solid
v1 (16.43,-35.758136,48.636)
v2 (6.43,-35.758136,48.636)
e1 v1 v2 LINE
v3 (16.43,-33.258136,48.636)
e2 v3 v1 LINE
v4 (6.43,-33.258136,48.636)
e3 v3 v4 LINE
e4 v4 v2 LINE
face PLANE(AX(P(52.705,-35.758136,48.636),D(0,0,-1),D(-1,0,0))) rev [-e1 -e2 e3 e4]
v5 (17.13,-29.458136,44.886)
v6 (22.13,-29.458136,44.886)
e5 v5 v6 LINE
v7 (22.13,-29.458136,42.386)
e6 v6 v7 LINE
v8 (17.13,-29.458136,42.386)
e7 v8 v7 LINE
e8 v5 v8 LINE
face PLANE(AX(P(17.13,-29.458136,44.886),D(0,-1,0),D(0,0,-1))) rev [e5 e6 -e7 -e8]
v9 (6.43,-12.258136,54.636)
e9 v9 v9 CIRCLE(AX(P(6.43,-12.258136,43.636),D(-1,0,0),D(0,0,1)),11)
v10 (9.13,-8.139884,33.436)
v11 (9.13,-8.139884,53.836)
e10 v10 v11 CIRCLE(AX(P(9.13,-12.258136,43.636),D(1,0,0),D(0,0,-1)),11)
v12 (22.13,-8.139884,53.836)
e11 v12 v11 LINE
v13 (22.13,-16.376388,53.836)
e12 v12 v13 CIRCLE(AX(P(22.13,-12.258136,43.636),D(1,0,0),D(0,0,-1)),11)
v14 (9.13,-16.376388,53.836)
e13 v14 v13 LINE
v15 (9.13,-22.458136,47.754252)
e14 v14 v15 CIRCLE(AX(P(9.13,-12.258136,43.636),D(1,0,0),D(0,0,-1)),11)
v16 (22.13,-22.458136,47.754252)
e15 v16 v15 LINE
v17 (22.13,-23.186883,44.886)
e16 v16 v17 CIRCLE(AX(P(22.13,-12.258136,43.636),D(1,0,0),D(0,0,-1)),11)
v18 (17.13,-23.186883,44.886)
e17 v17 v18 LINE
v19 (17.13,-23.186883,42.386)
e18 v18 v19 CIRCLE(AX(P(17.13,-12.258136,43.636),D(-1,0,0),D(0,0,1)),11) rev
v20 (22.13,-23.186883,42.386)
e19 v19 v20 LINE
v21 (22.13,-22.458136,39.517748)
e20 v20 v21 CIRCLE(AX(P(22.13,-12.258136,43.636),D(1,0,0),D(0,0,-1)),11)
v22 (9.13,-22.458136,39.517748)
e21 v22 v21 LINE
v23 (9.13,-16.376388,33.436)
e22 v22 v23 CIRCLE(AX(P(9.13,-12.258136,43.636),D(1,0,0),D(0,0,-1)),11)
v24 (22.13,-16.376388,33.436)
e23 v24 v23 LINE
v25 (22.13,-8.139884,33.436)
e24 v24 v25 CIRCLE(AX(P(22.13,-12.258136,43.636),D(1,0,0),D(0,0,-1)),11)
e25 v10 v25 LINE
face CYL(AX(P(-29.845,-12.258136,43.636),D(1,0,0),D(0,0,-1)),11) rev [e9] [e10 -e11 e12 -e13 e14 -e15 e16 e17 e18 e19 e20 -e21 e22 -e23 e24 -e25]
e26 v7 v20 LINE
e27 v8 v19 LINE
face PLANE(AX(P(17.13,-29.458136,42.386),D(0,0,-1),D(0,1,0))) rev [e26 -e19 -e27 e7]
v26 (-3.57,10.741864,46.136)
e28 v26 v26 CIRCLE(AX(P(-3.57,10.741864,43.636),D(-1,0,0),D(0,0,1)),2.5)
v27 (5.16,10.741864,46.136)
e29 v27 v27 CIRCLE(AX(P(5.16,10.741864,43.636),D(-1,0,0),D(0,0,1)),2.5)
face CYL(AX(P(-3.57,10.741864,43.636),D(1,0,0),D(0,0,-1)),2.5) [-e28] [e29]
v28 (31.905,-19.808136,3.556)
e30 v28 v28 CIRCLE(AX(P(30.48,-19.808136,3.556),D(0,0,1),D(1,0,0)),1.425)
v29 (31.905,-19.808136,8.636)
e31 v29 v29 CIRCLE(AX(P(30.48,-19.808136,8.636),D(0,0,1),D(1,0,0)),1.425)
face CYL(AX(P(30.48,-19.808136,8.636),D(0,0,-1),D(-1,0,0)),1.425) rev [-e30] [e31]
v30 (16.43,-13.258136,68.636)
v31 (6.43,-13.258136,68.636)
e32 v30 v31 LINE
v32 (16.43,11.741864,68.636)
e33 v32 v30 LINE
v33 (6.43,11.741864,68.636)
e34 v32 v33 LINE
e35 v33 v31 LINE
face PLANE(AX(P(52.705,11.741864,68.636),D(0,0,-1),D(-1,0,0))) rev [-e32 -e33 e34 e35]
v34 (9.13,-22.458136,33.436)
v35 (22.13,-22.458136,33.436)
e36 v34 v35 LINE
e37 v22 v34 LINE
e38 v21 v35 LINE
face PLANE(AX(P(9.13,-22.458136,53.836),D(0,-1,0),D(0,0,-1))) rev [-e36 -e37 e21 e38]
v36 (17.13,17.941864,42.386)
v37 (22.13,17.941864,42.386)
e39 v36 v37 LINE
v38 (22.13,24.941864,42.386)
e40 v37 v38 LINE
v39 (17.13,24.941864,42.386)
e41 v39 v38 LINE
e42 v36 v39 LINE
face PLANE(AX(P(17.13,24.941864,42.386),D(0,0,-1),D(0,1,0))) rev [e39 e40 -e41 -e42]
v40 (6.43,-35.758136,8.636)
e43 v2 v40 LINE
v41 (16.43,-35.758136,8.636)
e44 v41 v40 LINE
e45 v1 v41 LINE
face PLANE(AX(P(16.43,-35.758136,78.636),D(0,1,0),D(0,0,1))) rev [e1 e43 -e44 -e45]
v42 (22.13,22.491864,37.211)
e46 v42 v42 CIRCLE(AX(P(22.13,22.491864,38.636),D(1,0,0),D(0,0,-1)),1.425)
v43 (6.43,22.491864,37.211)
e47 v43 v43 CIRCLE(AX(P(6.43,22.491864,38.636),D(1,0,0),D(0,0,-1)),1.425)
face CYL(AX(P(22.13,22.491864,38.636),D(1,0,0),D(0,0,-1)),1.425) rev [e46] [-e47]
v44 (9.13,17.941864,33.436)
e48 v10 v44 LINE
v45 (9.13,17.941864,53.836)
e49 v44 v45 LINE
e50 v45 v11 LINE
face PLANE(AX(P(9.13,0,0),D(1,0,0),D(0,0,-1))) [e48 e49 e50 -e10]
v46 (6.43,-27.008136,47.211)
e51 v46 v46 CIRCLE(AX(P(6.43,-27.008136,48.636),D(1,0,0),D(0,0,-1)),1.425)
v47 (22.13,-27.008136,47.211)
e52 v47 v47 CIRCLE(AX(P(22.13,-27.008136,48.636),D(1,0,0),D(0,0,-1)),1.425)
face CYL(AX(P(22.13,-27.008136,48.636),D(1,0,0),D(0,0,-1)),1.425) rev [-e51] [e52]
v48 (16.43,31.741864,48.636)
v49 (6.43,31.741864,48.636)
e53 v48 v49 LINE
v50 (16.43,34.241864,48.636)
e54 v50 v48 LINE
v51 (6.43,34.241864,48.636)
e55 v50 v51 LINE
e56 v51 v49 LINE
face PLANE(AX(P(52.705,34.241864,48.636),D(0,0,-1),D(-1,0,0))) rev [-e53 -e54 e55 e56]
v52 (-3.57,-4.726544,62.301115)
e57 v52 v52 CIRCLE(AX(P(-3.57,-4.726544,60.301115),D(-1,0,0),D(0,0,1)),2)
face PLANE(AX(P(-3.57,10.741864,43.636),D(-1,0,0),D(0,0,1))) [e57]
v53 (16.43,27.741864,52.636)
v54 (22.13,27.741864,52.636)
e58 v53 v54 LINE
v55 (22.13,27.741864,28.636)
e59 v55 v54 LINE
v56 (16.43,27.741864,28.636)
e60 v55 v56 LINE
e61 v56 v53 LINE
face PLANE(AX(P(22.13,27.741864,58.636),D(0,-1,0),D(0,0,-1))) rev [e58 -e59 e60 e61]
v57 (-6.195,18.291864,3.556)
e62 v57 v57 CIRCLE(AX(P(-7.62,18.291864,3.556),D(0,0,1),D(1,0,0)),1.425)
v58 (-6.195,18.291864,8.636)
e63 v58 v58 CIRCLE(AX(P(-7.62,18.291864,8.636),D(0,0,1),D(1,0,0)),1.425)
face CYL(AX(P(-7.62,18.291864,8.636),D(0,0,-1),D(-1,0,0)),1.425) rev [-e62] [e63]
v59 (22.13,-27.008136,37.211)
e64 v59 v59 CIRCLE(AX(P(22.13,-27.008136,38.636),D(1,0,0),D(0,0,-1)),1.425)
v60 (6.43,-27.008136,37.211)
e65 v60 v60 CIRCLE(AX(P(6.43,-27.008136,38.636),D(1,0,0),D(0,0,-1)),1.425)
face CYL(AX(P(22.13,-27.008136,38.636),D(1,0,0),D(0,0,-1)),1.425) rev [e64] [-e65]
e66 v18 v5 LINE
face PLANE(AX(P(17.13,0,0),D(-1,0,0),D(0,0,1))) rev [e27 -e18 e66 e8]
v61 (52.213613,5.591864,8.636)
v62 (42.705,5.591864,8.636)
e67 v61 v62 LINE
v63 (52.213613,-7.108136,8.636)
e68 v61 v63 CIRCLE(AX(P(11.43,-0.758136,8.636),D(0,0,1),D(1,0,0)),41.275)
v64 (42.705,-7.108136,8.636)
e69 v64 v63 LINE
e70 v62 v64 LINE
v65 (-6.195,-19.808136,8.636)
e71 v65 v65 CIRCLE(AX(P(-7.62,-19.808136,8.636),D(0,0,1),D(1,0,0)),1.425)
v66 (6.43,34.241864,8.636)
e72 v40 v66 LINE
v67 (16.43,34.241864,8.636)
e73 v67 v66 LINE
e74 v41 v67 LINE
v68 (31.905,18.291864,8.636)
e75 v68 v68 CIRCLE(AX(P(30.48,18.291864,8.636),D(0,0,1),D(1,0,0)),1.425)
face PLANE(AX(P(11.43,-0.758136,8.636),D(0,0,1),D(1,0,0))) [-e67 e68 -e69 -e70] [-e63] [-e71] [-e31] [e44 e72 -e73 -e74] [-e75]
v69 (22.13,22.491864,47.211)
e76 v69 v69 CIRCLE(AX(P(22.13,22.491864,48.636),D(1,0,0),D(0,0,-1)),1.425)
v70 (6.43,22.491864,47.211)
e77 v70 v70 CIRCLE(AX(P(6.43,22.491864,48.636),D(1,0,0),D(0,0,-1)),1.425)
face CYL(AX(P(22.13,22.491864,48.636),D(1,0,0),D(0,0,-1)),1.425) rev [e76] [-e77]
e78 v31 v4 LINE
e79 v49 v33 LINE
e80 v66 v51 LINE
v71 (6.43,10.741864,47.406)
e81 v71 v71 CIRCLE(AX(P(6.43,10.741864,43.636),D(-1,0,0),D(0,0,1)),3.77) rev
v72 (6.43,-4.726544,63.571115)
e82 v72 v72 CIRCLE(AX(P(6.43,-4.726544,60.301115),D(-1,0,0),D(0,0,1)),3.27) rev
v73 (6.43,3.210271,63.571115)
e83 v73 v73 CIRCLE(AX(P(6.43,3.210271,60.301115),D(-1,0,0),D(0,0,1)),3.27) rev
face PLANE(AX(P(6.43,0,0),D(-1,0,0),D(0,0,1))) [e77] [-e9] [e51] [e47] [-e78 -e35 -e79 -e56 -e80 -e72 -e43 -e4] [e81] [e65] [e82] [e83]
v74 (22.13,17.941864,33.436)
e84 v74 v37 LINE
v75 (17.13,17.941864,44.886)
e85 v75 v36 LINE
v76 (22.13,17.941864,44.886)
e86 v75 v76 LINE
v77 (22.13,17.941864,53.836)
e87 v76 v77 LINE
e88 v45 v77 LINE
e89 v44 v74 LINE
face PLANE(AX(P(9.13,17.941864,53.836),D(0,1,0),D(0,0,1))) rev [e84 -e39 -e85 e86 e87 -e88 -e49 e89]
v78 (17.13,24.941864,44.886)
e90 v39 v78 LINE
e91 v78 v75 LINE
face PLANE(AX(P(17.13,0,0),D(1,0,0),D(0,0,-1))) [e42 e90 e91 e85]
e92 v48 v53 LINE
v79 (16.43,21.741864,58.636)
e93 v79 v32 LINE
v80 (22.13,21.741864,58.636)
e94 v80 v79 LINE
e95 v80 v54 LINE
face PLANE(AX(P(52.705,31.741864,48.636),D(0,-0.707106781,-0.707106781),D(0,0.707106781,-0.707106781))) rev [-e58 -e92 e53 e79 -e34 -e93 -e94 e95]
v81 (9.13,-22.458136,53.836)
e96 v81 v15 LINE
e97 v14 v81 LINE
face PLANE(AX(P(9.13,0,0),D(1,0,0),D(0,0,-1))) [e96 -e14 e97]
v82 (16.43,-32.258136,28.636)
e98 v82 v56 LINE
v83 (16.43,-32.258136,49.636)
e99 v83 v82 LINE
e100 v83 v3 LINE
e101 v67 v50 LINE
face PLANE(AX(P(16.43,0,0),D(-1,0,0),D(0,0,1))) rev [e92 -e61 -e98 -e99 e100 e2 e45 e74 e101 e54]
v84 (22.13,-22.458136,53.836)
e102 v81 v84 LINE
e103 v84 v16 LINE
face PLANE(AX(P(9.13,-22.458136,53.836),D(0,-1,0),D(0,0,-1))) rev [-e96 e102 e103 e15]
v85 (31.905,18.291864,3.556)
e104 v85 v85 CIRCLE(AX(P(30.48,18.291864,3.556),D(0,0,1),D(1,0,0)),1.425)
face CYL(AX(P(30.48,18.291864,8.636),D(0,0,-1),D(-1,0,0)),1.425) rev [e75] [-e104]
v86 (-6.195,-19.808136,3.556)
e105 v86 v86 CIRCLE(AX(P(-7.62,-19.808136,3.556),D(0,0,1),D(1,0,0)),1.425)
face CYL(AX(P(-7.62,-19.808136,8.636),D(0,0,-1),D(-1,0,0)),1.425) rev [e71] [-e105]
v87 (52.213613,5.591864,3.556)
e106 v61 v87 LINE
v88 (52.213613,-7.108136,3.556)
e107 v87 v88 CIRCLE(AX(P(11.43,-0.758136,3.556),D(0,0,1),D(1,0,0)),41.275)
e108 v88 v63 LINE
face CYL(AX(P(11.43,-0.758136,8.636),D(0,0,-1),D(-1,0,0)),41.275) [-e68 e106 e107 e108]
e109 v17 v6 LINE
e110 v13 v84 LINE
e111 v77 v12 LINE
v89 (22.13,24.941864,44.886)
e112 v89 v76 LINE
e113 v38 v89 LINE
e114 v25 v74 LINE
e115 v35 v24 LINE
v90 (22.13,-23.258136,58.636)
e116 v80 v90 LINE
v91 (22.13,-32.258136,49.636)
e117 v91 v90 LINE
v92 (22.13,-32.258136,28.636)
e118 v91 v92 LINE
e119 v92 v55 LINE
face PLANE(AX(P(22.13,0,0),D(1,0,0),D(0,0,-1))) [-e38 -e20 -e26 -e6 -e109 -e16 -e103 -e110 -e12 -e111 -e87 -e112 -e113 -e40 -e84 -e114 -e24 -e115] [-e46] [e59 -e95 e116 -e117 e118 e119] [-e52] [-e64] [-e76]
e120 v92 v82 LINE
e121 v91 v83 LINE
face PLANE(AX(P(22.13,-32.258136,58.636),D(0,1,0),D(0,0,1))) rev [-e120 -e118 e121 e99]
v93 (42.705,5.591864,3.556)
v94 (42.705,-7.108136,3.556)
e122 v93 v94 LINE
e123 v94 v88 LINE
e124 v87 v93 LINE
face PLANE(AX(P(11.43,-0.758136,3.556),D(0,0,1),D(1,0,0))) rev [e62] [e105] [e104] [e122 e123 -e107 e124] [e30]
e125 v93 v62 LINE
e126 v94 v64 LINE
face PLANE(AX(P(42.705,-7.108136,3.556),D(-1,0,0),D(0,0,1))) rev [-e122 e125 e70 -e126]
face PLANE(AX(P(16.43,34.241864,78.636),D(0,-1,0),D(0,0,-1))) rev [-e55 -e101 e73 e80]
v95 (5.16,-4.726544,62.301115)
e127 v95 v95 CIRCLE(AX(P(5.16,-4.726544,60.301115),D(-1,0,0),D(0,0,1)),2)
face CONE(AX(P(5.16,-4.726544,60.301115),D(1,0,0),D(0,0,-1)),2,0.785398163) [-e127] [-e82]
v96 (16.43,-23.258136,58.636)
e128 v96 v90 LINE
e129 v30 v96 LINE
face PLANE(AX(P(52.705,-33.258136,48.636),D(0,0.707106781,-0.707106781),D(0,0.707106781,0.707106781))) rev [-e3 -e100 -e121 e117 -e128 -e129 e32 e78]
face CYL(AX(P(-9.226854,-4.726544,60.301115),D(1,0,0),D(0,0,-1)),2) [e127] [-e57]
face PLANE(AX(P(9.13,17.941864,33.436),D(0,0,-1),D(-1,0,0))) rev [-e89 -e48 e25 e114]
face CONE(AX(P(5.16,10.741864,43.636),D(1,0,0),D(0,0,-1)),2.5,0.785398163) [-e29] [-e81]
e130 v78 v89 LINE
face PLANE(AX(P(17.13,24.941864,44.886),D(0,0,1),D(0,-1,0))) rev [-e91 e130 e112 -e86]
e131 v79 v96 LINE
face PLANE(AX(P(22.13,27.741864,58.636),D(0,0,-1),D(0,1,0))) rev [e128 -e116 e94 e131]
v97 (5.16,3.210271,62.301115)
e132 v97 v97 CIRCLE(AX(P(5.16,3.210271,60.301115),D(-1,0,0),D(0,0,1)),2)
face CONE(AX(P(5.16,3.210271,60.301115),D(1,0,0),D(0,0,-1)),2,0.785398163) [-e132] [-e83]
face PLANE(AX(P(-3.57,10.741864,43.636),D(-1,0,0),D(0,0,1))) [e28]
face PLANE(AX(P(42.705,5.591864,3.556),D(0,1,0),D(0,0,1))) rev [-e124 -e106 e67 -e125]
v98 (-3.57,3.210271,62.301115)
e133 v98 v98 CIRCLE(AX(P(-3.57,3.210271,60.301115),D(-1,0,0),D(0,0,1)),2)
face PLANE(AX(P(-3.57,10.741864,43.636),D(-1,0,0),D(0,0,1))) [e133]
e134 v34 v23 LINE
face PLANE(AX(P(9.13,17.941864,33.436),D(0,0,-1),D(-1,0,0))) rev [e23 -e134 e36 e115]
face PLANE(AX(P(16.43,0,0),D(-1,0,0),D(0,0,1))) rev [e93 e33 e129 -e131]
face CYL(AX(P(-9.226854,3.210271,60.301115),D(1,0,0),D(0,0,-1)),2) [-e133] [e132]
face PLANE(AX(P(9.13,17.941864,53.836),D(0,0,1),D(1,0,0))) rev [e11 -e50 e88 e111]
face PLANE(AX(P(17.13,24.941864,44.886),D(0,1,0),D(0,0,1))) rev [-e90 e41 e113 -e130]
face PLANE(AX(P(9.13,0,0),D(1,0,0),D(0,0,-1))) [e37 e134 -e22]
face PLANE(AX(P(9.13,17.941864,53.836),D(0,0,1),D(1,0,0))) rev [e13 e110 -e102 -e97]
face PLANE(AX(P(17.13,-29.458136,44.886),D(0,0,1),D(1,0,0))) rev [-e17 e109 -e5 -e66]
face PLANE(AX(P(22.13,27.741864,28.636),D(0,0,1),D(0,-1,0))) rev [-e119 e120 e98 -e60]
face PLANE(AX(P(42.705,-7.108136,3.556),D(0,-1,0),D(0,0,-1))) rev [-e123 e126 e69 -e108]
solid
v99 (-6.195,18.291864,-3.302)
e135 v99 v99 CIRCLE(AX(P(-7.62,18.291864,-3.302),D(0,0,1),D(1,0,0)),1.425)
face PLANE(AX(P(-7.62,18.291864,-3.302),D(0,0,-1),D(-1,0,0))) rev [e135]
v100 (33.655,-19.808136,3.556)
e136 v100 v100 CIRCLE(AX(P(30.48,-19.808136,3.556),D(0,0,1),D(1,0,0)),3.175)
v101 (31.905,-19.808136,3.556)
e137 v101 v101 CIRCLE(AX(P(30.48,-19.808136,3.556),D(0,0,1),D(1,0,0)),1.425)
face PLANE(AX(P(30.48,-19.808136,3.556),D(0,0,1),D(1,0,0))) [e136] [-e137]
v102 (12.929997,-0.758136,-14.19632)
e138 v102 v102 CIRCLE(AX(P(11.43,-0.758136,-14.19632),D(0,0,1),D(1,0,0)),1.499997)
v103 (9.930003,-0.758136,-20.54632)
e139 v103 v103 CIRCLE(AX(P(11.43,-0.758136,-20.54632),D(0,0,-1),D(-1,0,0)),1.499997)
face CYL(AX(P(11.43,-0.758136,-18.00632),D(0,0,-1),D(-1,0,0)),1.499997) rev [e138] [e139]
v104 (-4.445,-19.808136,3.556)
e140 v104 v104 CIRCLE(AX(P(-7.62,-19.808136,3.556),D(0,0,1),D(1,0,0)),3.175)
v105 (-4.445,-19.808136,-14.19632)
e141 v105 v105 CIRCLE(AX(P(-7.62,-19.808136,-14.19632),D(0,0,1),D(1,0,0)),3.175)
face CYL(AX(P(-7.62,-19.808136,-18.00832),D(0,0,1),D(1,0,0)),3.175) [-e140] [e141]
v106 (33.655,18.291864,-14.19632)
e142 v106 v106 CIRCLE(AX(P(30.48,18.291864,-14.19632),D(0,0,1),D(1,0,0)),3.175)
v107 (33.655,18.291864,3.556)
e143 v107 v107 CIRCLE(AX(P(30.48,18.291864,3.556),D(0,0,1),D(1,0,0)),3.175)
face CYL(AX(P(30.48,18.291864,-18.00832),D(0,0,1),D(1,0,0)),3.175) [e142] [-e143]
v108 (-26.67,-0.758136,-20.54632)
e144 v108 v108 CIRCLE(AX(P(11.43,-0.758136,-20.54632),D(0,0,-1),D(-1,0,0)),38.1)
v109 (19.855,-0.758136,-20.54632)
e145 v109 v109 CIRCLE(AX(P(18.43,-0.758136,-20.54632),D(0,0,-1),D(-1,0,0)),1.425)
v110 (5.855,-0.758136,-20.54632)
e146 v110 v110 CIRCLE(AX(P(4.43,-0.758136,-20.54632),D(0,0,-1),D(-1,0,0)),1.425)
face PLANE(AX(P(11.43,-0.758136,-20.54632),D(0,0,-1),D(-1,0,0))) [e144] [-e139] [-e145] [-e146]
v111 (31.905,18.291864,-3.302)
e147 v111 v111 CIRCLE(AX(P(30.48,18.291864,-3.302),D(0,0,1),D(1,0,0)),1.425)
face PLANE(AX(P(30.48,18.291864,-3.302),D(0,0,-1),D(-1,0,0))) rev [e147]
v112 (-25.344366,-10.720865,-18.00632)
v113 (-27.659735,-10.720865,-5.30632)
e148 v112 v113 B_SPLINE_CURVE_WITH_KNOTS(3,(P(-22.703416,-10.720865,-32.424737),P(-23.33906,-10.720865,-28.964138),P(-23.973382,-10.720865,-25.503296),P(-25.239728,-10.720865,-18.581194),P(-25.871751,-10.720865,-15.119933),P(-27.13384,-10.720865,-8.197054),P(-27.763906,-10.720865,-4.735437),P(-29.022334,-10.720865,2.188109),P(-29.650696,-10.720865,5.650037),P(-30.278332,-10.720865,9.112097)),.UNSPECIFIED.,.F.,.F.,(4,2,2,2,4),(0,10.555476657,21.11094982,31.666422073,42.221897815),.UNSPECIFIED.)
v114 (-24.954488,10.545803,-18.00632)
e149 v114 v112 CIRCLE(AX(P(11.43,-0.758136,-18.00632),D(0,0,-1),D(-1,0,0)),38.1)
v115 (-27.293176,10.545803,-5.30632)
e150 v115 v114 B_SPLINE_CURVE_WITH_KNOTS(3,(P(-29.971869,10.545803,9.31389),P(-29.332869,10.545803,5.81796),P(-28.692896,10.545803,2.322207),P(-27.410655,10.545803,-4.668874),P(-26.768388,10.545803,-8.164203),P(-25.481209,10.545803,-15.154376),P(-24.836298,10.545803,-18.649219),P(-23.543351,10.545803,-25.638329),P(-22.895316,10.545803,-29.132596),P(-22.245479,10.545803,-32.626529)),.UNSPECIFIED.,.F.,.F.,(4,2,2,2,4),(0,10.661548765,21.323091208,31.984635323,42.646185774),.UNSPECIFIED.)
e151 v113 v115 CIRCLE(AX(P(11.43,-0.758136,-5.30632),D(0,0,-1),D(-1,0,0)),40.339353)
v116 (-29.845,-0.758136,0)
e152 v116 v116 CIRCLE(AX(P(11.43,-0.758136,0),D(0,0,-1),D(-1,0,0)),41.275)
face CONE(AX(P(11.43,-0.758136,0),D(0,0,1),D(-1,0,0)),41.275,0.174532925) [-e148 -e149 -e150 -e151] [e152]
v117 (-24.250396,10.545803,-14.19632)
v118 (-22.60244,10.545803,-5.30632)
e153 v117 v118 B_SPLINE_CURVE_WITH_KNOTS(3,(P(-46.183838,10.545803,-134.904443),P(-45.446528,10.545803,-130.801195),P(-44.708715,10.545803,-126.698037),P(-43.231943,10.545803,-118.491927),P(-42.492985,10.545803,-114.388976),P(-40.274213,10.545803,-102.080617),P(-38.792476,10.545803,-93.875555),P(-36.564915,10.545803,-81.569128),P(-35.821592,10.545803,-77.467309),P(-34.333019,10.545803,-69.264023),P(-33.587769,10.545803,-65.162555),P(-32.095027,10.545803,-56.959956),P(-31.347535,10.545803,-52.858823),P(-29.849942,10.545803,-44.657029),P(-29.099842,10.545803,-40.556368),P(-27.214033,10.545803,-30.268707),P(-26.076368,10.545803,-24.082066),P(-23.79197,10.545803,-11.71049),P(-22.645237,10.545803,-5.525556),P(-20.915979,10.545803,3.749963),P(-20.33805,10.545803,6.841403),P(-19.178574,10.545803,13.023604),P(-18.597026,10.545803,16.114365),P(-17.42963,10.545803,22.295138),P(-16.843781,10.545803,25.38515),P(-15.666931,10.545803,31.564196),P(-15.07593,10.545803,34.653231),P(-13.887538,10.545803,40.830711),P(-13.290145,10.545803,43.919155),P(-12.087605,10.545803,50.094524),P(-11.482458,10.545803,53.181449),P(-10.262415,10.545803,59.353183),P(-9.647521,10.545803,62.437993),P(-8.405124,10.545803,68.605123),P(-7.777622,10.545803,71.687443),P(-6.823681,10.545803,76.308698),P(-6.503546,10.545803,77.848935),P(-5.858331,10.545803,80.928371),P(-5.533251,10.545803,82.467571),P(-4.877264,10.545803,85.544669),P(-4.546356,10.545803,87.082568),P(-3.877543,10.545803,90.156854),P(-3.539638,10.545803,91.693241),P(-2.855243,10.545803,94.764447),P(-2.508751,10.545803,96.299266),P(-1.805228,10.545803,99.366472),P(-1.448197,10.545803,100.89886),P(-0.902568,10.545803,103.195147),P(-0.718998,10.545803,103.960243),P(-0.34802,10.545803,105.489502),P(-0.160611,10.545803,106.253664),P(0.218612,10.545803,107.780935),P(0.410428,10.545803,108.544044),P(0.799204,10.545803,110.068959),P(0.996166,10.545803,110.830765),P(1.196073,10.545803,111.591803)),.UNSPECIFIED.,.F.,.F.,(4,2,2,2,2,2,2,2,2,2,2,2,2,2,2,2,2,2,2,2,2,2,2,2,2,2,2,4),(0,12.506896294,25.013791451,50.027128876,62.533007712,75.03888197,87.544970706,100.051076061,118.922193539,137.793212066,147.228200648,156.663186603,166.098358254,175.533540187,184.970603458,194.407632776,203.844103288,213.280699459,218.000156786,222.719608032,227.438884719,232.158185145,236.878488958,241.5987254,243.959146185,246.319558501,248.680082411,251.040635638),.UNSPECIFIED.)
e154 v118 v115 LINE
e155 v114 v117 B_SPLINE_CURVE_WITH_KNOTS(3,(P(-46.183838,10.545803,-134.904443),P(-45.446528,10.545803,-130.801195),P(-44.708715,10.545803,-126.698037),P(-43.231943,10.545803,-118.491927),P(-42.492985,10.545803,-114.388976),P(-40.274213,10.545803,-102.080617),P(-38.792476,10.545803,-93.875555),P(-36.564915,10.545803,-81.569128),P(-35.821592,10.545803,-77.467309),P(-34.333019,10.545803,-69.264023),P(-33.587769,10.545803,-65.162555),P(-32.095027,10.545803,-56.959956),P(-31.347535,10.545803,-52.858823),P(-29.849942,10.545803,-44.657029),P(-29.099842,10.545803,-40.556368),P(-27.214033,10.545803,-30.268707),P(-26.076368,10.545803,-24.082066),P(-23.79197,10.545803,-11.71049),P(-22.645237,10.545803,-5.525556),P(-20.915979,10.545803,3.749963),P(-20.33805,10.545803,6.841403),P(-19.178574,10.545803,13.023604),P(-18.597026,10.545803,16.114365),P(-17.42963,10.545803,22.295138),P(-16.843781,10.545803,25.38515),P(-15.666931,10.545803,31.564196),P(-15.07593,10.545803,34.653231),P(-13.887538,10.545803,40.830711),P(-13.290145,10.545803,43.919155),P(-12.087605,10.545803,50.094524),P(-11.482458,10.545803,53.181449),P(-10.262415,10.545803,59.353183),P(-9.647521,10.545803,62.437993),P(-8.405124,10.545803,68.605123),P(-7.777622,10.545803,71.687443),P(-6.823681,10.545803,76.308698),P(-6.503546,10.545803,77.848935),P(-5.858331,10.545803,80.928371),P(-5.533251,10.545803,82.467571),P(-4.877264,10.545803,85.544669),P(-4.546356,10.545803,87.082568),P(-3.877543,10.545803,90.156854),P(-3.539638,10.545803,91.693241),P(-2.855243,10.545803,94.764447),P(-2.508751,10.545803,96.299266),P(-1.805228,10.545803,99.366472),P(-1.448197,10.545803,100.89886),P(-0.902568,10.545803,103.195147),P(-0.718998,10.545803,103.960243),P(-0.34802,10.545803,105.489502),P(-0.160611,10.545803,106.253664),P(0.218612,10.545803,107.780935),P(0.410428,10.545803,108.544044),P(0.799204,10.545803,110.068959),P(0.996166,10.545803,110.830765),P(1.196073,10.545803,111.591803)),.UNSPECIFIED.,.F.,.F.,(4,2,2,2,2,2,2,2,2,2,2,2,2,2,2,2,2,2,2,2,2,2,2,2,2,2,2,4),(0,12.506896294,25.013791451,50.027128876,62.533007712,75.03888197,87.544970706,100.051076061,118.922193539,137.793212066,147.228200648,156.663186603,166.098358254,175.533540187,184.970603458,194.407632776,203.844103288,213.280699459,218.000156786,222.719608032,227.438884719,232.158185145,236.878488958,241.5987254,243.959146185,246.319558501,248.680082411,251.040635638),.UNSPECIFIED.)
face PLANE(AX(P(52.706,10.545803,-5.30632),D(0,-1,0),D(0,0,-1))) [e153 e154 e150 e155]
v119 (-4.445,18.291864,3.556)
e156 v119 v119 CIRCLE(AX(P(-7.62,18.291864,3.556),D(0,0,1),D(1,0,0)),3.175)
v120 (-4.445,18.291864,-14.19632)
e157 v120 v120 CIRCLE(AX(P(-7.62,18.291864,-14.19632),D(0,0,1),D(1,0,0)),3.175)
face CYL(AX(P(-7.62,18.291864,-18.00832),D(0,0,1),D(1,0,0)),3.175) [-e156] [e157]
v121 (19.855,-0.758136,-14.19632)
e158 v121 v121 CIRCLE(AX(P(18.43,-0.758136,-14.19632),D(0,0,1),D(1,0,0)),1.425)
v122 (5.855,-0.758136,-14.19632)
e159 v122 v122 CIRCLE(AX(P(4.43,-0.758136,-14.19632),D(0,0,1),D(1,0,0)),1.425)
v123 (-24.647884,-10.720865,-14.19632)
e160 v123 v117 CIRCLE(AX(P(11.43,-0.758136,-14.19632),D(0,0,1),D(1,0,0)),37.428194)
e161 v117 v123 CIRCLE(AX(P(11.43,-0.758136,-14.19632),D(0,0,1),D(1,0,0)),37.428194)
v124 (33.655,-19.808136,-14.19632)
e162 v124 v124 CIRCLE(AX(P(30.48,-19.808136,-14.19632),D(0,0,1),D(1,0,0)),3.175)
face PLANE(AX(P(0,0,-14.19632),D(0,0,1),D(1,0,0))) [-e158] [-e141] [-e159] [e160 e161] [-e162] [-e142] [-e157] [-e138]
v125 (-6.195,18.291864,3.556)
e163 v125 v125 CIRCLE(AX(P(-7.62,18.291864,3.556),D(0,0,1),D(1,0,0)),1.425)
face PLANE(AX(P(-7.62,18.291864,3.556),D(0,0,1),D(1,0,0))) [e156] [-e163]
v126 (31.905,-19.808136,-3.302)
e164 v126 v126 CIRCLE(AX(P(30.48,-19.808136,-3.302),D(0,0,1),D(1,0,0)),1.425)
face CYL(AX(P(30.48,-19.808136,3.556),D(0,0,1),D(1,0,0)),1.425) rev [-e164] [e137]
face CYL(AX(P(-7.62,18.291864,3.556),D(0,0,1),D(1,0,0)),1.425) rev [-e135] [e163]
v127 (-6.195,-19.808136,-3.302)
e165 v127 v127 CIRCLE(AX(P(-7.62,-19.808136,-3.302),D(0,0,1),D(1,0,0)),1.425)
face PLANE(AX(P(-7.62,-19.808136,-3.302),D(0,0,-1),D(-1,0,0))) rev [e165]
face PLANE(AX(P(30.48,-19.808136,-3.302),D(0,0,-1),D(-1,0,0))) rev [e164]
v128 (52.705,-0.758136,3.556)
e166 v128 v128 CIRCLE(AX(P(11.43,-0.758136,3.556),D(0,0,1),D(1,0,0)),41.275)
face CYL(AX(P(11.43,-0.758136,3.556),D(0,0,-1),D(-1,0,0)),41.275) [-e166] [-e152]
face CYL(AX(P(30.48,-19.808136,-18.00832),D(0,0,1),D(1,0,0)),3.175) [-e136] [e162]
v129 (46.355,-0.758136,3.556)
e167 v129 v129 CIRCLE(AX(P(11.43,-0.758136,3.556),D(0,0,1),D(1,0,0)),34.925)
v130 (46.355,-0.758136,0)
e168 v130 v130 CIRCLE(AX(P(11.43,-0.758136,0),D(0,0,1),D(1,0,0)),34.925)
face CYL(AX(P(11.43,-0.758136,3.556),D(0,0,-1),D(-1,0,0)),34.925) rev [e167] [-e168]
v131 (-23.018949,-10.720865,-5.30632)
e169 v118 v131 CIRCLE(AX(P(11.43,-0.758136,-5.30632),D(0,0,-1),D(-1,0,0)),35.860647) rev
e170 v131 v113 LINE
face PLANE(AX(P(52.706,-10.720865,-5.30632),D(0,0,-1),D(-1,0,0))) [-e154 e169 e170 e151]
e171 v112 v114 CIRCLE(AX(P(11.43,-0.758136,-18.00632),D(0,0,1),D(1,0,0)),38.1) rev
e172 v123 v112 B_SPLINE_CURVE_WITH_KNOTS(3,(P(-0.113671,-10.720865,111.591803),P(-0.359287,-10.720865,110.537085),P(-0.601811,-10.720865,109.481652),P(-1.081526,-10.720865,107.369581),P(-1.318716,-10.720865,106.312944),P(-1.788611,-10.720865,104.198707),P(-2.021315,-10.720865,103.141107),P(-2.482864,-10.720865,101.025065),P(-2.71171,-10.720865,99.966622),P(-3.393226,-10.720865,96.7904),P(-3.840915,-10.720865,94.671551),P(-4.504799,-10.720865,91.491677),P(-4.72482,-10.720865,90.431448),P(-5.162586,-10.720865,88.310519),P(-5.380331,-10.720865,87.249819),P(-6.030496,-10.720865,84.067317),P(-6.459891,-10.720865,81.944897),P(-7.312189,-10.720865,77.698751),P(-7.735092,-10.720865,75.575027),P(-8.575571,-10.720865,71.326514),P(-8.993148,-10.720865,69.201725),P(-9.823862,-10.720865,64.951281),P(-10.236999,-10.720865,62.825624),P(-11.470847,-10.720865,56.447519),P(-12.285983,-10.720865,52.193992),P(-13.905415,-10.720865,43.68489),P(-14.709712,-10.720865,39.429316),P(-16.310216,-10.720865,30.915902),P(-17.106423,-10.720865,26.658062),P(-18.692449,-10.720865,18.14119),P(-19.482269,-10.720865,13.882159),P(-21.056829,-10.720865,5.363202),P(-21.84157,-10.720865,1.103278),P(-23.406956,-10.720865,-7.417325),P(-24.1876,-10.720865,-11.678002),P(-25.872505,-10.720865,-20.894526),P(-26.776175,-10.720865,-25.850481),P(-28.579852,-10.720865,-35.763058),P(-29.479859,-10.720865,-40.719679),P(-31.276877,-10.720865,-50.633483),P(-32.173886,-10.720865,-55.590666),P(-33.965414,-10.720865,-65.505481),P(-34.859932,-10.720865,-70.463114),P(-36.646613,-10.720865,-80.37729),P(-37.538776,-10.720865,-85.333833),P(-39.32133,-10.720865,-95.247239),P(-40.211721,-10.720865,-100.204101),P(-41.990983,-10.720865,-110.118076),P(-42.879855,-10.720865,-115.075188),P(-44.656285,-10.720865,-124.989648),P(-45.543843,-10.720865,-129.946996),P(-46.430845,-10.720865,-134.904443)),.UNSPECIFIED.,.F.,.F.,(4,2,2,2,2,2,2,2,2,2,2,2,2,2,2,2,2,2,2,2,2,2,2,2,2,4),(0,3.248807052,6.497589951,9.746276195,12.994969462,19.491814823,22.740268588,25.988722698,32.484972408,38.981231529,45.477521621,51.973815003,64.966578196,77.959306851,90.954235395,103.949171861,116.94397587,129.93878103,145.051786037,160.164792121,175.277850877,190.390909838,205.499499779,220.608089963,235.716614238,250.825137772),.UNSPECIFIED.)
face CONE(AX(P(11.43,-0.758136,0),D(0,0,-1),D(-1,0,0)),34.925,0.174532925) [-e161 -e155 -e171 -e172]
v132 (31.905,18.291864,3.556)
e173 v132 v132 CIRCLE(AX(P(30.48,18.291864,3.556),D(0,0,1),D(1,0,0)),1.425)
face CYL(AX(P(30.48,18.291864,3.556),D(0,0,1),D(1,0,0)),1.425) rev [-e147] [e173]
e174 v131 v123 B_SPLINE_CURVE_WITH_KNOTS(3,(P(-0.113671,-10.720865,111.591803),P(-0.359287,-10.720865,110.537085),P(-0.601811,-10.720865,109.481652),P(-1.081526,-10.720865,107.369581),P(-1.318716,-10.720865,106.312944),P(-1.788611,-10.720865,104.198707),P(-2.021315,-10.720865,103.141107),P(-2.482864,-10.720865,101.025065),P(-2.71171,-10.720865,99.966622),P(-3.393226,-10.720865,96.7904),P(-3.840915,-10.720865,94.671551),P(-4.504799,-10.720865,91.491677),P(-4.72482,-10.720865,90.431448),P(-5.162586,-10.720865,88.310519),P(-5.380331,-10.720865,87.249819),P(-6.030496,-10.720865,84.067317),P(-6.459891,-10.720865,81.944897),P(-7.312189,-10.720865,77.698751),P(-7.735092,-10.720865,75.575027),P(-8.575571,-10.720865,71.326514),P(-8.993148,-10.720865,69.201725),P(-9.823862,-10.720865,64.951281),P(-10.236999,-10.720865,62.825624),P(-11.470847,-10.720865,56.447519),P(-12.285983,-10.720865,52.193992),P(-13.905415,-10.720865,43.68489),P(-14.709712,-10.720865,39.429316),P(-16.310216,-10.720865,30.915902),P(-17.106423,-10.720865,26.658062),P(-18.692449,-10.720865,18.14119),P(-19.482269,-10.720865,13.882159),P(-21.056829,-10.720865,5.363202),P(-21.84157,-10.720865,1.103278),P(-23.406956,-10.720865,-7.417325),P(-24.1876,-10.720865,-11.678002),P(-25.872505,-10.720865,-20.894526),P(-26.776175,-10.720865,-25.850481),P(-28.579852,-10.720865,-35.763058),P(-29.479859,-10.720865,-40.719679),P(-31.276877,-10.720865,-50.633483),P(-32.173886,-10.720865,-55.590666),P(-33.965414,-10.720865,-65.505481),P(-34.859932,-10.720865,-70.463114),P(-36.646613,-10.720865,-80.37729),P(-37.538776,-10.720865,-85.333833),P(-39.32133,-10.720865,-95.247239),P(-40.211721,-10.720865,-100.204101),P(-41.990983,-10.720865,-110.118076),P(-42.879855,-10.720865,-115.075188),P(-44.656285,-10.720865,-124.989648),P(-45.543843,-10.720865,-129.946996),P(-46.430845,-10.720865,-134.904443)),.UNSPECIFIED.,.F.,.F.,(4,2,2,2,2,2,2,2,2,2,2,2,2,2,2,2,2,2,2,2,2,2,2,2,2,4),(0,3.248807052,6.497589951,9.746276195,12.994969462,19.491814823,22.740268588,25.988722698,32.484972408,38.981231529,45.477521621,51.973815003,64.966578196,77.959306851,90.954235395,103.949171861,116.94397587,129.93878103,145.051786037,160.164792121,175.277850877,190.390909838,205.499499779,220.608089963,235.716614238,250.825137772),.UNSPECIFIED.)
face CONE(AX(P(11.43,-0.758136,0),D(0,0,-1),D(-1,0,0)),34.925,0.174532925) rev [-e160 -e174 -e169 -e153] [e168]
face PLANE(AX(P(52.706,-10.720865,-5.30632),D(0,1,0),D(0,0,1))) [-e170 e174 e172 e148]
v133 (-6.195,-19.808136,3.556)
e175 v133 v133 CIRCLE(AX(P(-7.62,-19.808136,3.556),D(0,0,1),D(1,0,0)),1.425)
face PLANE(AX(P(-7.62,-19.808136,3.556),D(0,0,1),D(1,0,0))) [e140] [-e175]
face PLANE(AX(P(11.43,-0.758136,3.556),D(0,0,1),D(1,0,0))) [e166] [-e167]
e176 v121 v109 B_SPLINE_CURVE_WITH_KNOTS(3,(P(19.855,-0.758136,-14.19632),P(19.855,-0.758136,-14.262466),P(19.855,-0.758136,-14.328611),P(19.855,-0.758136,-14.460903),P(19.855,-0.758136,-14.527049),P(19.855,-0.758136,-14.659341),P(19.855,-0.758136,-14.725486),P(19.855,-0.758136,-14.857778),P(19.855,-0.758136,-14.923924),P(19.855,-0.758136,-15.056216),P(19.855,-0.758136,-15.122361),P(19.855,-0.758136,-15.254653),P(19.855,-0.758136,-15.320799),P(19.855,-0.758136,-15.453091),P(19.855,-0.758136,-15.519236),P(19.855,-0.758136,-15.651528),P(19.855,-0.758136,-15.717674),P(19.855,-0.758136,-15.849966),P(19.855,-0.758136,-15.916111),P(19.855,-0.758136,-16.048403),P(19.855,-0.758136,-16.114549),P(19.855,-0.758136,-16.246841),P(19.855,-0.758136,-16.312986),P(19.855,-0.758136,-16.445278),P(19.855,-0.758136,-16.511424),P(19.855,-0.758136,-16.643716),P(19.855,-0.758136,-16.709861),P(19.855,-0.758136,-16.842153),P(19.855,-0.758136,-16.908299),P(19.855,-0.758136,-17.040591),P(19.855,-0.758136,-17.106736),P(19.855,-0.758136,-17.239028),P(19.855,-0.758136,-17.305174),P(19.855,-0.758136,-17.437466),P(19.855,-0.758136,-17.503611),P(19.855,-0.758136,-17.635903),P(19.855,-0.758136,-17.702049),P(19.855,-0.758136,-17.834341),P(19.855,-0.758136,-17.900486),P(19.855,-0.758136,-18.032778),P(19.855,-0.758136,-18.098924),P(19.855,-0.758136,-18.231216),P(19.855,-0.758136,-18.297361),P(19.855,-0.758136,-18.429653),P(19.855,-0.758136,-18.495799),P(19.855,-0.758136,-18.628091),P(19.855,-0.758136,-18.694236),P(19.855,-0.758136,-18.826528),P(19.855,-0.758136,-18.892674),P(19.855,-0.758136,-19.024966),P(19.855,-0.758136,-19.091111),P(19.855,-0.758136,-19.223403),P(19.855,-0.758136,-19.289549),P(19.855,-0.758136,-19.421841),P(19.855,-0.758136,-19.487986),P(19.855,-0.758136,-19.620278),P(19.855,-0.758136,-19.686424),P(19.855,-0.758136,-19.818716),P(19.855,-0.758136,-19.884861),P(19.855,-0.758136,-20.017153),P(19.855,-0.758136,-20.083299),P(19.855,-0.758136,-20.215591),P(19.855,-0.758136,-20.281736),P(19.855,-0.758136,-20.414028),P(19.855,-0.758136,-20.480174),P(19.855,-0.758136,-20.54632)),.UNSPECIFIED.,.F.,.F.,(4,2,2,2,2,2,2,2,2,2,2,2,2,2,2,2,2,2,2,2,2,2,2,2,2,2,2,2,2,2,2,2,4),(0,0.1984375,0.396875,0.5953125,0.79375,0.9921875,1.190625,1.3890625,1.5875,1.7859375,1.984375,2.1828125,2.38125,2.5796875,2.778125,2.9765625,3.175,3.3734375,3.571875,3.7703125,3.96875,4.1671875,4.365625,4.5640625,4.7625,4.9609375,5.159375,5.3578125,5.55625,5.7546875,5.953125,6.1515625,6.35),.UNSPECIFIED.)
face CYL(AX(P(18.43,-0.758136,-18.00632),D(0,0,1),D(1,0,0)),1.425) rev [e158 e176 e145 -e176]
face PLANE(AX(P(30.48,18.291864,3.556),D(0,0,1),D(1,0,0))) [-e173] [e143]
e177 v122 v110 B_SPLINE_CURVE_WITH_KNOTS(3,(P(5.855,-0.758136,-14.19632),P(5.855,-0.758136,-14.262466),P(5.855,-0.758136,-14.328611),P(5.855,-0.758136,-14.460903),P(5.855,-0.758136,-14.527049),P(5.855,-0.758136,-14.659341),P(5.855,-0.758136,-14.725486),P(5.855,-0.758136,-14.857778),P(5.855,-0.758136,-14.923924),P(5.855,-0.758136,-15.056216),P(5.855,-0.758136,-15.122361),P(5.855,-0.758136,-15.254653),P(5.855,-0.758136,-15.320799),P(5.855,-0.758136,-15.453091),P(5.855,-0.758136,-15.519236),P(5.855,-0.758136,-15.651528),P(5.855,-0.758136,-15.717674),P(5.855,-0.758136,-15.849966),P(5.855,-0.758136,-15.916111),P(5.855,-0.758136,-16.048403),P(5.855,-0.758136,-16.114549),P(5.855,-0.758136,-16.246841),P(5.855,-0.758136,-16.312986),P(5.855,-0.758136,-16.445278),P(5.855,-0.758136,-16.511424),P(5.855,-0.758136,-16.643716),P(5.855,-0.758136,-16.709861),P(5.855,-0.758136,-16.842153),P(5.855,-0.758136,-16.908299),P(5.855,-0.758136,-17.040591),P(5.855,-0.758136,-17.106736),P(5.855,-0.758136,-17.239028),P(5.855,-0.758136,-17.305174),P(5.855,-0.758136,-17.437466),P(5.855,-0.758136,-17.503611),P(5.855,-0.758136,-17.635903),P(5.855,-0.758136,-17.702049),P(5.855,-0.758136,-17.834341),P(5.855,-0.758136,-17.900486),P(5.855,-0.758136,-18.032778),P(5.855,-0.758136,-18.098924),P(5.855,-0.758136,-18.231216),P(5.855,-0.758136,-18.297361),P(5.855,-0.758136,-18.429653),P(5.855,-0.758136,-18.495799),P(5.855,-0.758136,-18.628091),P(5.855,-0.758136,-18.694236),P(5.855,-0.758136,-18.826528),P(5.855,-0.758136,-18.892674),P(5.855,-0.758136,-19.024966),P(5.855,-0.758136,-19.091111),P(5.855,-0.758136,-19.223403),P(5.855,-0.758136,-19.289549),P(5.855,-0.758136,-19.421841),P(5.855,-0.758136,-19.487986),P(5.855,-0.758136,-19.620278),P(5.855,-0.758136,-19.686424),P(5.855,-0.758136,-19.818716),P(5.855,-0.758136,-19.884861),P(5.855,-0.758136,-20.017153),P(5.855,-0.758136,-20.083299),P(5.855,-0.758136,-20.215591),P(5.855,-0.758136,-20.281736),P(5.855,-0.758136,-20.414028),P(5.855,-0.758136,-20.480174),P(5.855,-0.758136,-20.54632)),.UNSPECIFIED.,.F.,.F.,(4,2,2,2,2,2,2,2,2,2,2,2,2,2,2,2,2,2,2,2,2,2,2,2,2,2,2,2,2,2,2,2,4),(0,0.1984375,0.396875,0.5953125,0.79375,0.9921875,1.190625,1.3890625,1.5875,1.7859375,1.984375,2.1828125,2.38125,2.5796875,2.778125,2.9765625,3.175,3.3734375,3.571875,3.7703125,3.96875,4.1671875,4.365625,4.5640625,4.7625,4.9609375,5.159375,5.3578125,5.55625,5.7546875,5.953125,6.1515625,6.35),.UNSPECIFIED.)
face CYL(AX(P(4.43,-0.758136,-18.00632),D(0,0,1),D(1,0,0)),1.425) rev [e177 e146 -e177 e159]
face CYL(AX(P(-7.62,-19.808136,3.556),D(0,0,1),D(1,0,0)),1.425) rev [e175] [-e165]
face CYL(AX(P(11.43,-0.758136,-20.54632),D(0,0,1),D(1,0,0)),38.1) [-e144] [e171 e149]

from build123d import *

# Parameters (mm, degrees)
SKETCH2_R                      = 41.27500000000001
SKETCH2_R_2                    = 34.925000000000004
BOSS_EXTRUDE1_DEPTH            = 3.555999999999654
SKETCH54_R                     = 41.27500000000001
SKETCH54_R_2                   = 34.92500000000001
BOSS_EXTRUDE2_DEPTH            = 25.4
BOSS_EXTRUDE2_TAPER            = 10.000000000000021
BOSS_EXTRUDE3_START            = -18.006319777
BOSS_EXTRUDE3_OUTLINE_R        = 38.1
BOSS_EXTRUDE3_DEPTH            = 3.81
BOSS_EXTRUDE5_REACH            = 72.778
SKETCH63_R                     = 3.175000000000002
SKETCH63_R_2                   = 3.175000000000009
SKETCH63_R_3                   = 3.1750000000000056
F_3_0MM_DOWEL_HOLE4_D          = 2.85
F_3_0MM_DOWEL_HOLE4_DEPTH      = 6.858
F_3_0MM_DOWEL_HOLE3_D          = 2.999994
CUT_EXTRUDE2_REACH             = 126.878
SKETCH58_W                     = 12.700000000000001
SKETCH58_H                     = 21.266668123278706
SKETCH60_R                     = 1.4249999999999978
SKETCH60_R_2                   = 1.4250000000000005
CUT_EXTRUDE4_DEPTH             = 70.71188168256496
SKETCH64_R                     = 1.425000000000001
SKETCH64_R_2                   = 1.4249999999999978
SKETCH64_R_3                   = 1.499996999999999
BOSS_EXTRUDE6_DEPTH            = 2.54
SKETCH67_R                     = 41.27500000000003
SKETCH67_R_2                   = 1.4249999999999985
SKETCH67_R_3                   = 1.4249999999999976
BOSS_EXTRUDE7_DEPTH            = 5.08
SKETCH68_W                     = 20
SKETCH68_H                     = 12.7
CUT_EXTRUDE5_DEPTH             = 5.08
BOSS_EXTRUDE8_START            = 11.43
SKETCH70_W                     = 70.00000000000001
SKETCH70_H                     = 70
BOSS_EXTRUDE8_DEPTH            = 5
BOSS_EXTRUDE9_DEPTH            = 5.699999999999999
CUT_EXTRUDE6_DEPTH             = 13
F_3_0MM_DOWEL_HOLE5_AT_2_COUNT = 2
F_3_0MM_DOWEL_HOLE5_AT_2_PITCH = 10
F_3_0MM_DOWEL_HOLE5_AT_3_COUNT = 2
F_3_0MM_DOWEL_HOLE5_AT_3_PITCH = 49.5
F_3_0MM_DOWEL_HOLE5_AT_4_COUNT = 2
F_3_0MM_DOWEL_HOLE5_AT_4_PITCH = 50.5
CUT_EXTRUDE7_DEPTH             = 100.24306365899265
CUT_EXTRUDE7_DEPTH_BACK        = 100.24306365899265
SKETCH76_R                     = 11
CUT_EXTRUDE9_DEPTH             = 5
SKETCH78_R                     = 2.5000000000000018
BOSS_EXTRUDE10_DEPTH           = 10
SKETCH79_R                     = 2.000000000000003
BOSS_EXTRUDE11_DEPTH           = 10
CUT_EXTRUDE10_DEPTH            = 101.45785526758407
CHAMFER1_SIZE                  = 1.27


with BuildPart() as part:
    # Sketch2 → Boss-Extrude1 (new body)
    with BuildSketch(Plane(origin=(0, 0.7215916123591171, 0), x_dir=(1, 0, 0), z_dir=(0, 0, 1))):
        with Locations((11.43, -1.4797279014976155)):
            Circle(SKETCH2_R)
        with Locations((11.43, -1.4797279014976155)):
            Circle(SKETCH2_R_2, mode=Mode.SUBTRACT)
    extrude(amount=BOSS_EXTRUDE1_DEPTH)

    # Sketch54 → Boss-Extrude2 (add)
    with BuildSketch(Plane(origin=(0, 0, 0), x_dir=(-1, 0, 0), z_dir=(0, 0, -1))):
        with Locations((-11.43, -0.7581362891384984)):
            Circle(SKETCH54_R)
        with Locations(Location((-11.43, -0.7581362891384984, 0), (0, 0, 180))):
            Circle(SKETCH54_R_2, mode=Mode.SUBTRACT)
    extrude(amount=BOSS_EXTRUDE2_DEPTH, taper=BOSS_EXTRUDE2_TAPER)

    # Boss-Extrude3: read off the stored shape, not the designer's step
    # Boss-Extrude3 outline → Boss-Extrude3 (add)
    with BuildSketch(Plane.XY.offset(BOSS_EXTRUDE3_START)):
        with Locations((11.43, -0.758136289)):
            Circle(BOSS_EXTRUDE3_OUTLINE_R)
    extrude(amount=BOSS_EXTRUDE3_DEPTH)

    # Sketch63 → Boss-Extrude5 (add, up to next)
    with BuildSketch(Plane.XY.offset(3.555999999999654), mode=Mode.PRIVATE) as boss_extrude5_sk1:
        with Locations((-7.620000000000005, 18.291863710861502)):
            Circle(SKETCH63_R)
    boss_extrude5_tool1 = extrude(boss_extrude5_sk1.sketch, amount=-BOSS_EXTRUDE5_REACH, mode=Mode.PRIVATE) - part.part
    # Sketch63 → Boss-Extrude5 (add, up to next)
    with BuildSketch(Plane.XY.offset(3.555999999999654), mode=Mode.PRIVATE) as boss_extrude5_sk2:
        with Locations((30.479999999999997, 18.29186371086151)):
            Circle(SKETCH63_R_2)
    boss_extrude5_tool2 = extrude(boss_extrude5_sk2.sketch, amount=-BOSS_EXTRUDE5_REACH, mode=Mode.PRIVATE) - part.part
    # Sketch63 → Boss-Extrude5 (add, up to next)
    with BuildSketch(Plane.XY.offset(3.555999999999654), mode=Mode.PRIVATE) as boss_extrude5_sk3:
        with Locations((30.480000000000004, -19.8081362891385)):
            Circle(SKETCH63_R_2)
    boss_extrude5_tool3 = extrude(boss_extrude5_sk3.sketch, amount=-BOSS_EXTRUDE5_REACH, mode=Mode.PRIVATE) - part.part
    # Sketch63 → Boss-Extrude5 (add, up to next)
    with BuildSketch(Plane.XY.offset(3.555999999999654), mode=Mode.PRIVATE) as boss_extrude5_sk4:
        with Locations((-7.620000000000005, -19.8081362891385)):
            Circle(SKETCH63_R_3)
    boss_extrude5_tool4 = extrude(boss_extrude5_sk4.sketch, amount=-BOSS_EXTRUDE5_REACH, mode=Mode.PRIVATE) - part.part
    add(boss_extrude5_tool1.solids().sort_by_distance((-7.62, 18.291864, 3.556))[0])
    add(boss_extrude5_tool2.solids().sort_by_distance((30.48, 18.291864, 3.556))[0])
    add(boss_extrude5_tool3.solids().sort_by_distance((30.48, -19.808136, 3.556))[0])
    add(boss_extrude5_tool4.solids().sort_by_distance((-7.62, -19.808136, 3.556))[0])

    # Ø3.0mm Dowel Hole4
    with Locations(Plane.XY.offset(3.555999999999654)):
        with Locations((-7.62, 18.291863711), (30.48, 18.291863711), (30.48, -19.808136289), (-7.62, -19.808136289)):
            Hole(F_3_0MM_DOWEL_HOLE4_D / 2, depth=F_3_0MM_DOWEL_HOLE4_DEPTH)

    # Ø3.0mm Dowel Hole3 (through all)
    with Locations(Plane(origin=(0, 0, -18.006319777286222), x_dir=(-1, 0, 0), z_dir=(0, 0, -1))):
        with Locations((-11.43, -0.758136289)):
            Hole(F_3_0MM_DOWEL_HOLE3_D / 2)

    # Cut-Extrude2: up to this cone (the profile starts outside it)
    cut_extrude2_end = Plane(origin=(11.43, -0.7581362891384984, -11.65632), z_dir=(0, 0, -1)) * Cone(7.999516737370435, 65.961130686173, 328.7166474235434, mode=Mode.PRIVATE)
    # Sketch58 → Cut-Extrude2 (cut, up to the surface)
    with BuildSketch(Plane(origin=(-63.5, 0, 0), x_dir=(0, 0, -1), z_dir=(1, 0, 0)), mode=Mode.PRIVATE) as cut_extrude2_sk1:
        with Locations((11.656319777286228, -0.08753137128510957)):
            Rectangle(SKETCH58_W, SKETCH58_H)
    cut_extrude2_tool1 = extrude(cut_extrude2_sk1.sketch, amount=CUT_EXTRUDE2_REACH, mode=Mode.PRIVATE) - cut_extrude2_end
    add(cut_extrude2_tool1.solids().sort_by_distance((-63.5, -0.087531, -11.65632))[0], mode=Mode.SUBTRACT)

    # Sketch60 → Cut-Extrude4 (cut, through all)
    with BuildSketch(Plane.XY.offset(-14.196319777286222)):
        with Locations((18.43, -0.7581362891384957)):
            Circle(SKETCH60_R)
        with Locations((4.429999999999999, -0.7581362891384984)):
            Circle(SKETCH60_R_2)
    extrude(amount=-CUT_EXTRUDE4_DEPTH, mode=Mode.SUBTRACT)

    # Sketch64 → Boss-Extrude6 (add)
    with BuildSketch(Plane(origin=(0, 0, -18.006319777286222), x_dir=(-1, 0, 0), z_dir=(0, 0, -1))):
        with BuildLine():
            ThreePointArc((25.344366452837203, -10.720865432924475), (26.663599038852283, -0.05977229582778121), (24.954487952256596, 10.545802690354252))
            ThreePointArc((24.954487952256596, 10.545802690354252), (-49.52359903885228, -1.4565002824492193), (25.344366452837203, -10.720865432924475))
        make_face()
        with Locations(Location((-4.429999999999999, -0.7581362891384984, 0), (0, 0, 180))):
            Circle(SKETCH64_R, mode=Mode.SUBTRACT)
        with Locations(Location((-18.43, -0.7581362891384957, 0), (0, 0, 180))):
            Circle(SKETCH64_R_2, mode=Mode.SUBTRACT)
        with Locations((-11.43, -0.7581362891384984)):
            Circle(SKETCH64_R_3, mode=Mode.SUBTRACT)
    extrude(amount=BOSS_EXTRUDE6_DEPTH)


with BuildPart() as body_2:
    # Sketch67 → Boss-Extrude7 (new body)
    with BuildSketch(Plane.XY.offset(3.555999999999654)):
        with Locations((11.43, -0.7581362891384984)):
            Circle(SKETCH67_R)
        with Locations((-7.620000000000005, -19.8081362891385)):
            Circle(SKETCH67_R_2, mode=Mode.SUBTRACT)
        with Locations((30.480000000000004, -19.8081362891385)):
            Circle(SKETCH67_R_3, mode=Mode.SUBTRACT)
        with Locations((30.479999999999997, 18.29186371086151)):
            Circle(SKETCH67_R_3, mode=Mode.SUBTRACT)
        with Locations((-7.620000000000005, 18.291863710861502)):
            Circle(SKETCH67_R_2, mode=Mode.SUBTRACT)
    extrude(amount=BOSS_EXTRUDE7_DEPTH)

    # Sketch68 → Cut-Extrude5 (cut)
    with BuildSketch(Plane.XY.offset(8.635999999999655)):
        with Locations((52.70500000000003, -0.7581362891385006)):
            Rectangle(SKETCH68_W, SKETCH68_H)
    extrude(amount=-CUT_EXTRUDE5_DEPTH, mode=Mode.SUBTRACT)

    # Sketch70 → Boss-Extrude8 (add, symmetric)
    with BuildSketch(Plane(origin=(0, 0, 0), x_dir=(0, 0, -1), z_dir=(1, 0, 0)).offset(BOSS_EXTRUDE8_START)):
        with Locations((-43.63599999999966, -0.7581362891384948)):
            Rectangle(SKETCH70_W, SKETCH70_H)
    extrude(amount=BOSS_EXTRUDE8_DEPTH, both=True)

    # Sketch71 → Boss-Extrude9 (add)
    with BuildSketch(Plane(origin=(16.43, 0, 0), x_dir=(0, 0, -1), z_dir=(1, 0, 0))):
        Polygon((-58.635999999999655, 27.741863710861526), (-28.635999999999655, 27.741863710861526), (-28.635999999999648, -32.25813628913847), (-58.63599999999963, -32.25813628913847), align=None)
    extrude(amount=BOSS_EXTRUDE9_DEPTH)

    # Sketch72 → Cut-Extrude6 (cut)
    with BuildSketch(Plane(origin=(22.13, 0, 0), x_dir=(0, 0, -1), z_dir=(1, 0, 0))):
        Polygon((-53.83599999999965, 17.94186371086152), (-33.435999999999645, 17.941863710861533), (-33.435999999999645, -22.458136289138466), (-53.83599999999965, -22.45813628913848), align=None)
    extrude(amount=-CUT_EXTRUDE6_DEPTH, mode=Mode.SUBTRACT)

    # Sketch75 → Ø3.0mm Dowel Hole5 (revolve, cut)
    with BuildSketch(Plane(origin=(22.13, -27.00813628913847, 38.63599999999965), x_dir=(0, 0, -1), z_dir=(0, 1, 0))):
        Polygon((0, 0), (-3.85e-15, 15.700000000000003), (1.4249999999999974, 15.700000000000003), (1.4249999999999994, -1e-17), align=None)
    f_3_0mm_dowel_hole5 = revolve(axis=Axis((28.47999999999999, -27.00813628913847, 38.63599999999965), (-1, 0, 0)), mode=Mode.SUBTRACT)

    # Ø3.0mm Dowel Hole5 at 2: Ø3.0mm Dowel Hole5 ×2
    with Locations(*[(0, 0, i * F_3_0MM_DOWEL_HOLE5_AT_2_PITCH) for i in range(1, F_3_0MM_DOWEL_HOLE5_AT_2_COUNT)]):
        add(f_3_0mm_dowel_hole5, mode=Mode.SUBTRACT)

    # Ø3.0mm Dowel Hole5 at 3: Ø3.0mm Dowel Hole5 ×2
    with Locations(*[(0, i * F_3_0MM_DOWEL_HOLE5_AT_3_PITCH, 0) for i in range(1, F_3_0MM_DOWEL_HOLE5_AT_3_COUNT)]):
        add(f_3_0mm_dowel_hole5, mode=Mode.SUBTRACT)

    # Ø3.0mm Dowel Hole5 at 4: Ø3.0mm Dowel Hole5 ×2
    with Locations(*[Vector(0, 0.9801980198019803, 0.19801980198019806) * (i * F_3_0MM_DOWEL_HOLE5_AT_4_PITCH) for i in range(1, F_3_0MM_DOWEL_HOLE5_AT_4_COUNT)]):
        add(f_3_0mm_dowel_hole5, mode=Mode.SUBTRACT)

    # Sketch76 → Cut-Extrude7 (cut, two sides: drawn at the far end of the back side and taken through both)
    with BuildSketch(Plane(origin=(9.13, 0, 0), x_dir=(0, 0, -1), z_dir=(1, 0, 0)).offset(-CUT_EXTRUDE7_DEPTH_BACK)):
        with Locations(Location((-43.63599999999964, -12.258136289138482, 0), (0, 0, 338.013597003))):
            Circle(SKETCH76_R)
    extrude(amount=CUT_EXTRUDE7_DEPTH + CUT_EXTRUDE7_DEPTH_BACK, mode=Mode.SUBTRACT)

    # Sketch77 → Cut-Extrude9 (cut)
    with BuildSketch(Plane(origin=(22.13, 0, 0), x_dir=(0, 0, -1), z_dir=(1, 0, 0))):
        Polygon((-44.88599999999964, 24.941863710861522), (-42.38599999999964, 24.94186371086152), (-42.38599999999965, 17.941863710861515), (-44.88599999999963, 17.941863710861515), align=None)
        Polygon((-44.88599999999964, -29.458136289138476), (-42.38599999999965, -29.458136289138476), (-42.38599999999964, -22.45813628913848), (-44.88599999999964, -22.45813628913848), align=None)
    extrude(amount=-CUT_EXTRUDE9_DEPTH, mode=Mode.SUBTRACT)

    # Sketch78 → Boss-Extrude10 (add)
    with BuildSketch(Plane.ZY.offset(-6.429999999999999)):
        with Locations((43.63599999999964, 10.741863710861484)):
            Circle(SKETCH78_R)
    extrude(amount=BOSS_EXTRUDE10_DEPTH)

    # Sketch79 → Boss-Extrude11 (add)
    with BuildSketch(Plane.ZY.offset(-6.429999999999999)):
        with Locations((60.30111511679786, 3.2102714393784137)):
            Circle(SKETCH79_R)
        with Locations(Location((60.30111511679786, -4.726544017655412, 0), (0, 0, 180))):
            Circle(SKETCH79_R)
    extrude(amount=BOSS_EXTRUDE11_DEPTH)

    # Sketch80 → Cut-Extrude10 (cut, through all)
    with BuildSketch(Plane.ZY.offset(-6.429999999999999)):
        Polygon((78.63599999999967, 34.24186371086151), (48.63599999999967, 34.24186371086151), (48.63599999999967, 31.741863710861587), (68.63599999999967, 11.741863710861503), (68.63599999999967, -13.258136289138498), (48.63599999999967, -33.258136289138584), (48.63599999999967, -35.7581362891385), (78.63599999999967, -35.7581362891385), align=None)
    extrude(amount=-CUT_EXTRUDE10_DEPTH, mode=Mode.SUBTRACT)

    # Chamfer1
    chamfer1_edges = [body_2.edges().sort_by_distance(p)[0] for p in [
        (6.429999999999999, 10.741863710861484, 41.13599999999964),
        (6.429999999999999, 3.210271439378414, 58.30111511679786),
        (6.429999999999999, -4.726544017655413, 62.30111511679786),
    ]]
    chamfer(chamfer1_edges, length=CHAMFER1_SIZE)


solid = Compound([part.part, body_2.part])
